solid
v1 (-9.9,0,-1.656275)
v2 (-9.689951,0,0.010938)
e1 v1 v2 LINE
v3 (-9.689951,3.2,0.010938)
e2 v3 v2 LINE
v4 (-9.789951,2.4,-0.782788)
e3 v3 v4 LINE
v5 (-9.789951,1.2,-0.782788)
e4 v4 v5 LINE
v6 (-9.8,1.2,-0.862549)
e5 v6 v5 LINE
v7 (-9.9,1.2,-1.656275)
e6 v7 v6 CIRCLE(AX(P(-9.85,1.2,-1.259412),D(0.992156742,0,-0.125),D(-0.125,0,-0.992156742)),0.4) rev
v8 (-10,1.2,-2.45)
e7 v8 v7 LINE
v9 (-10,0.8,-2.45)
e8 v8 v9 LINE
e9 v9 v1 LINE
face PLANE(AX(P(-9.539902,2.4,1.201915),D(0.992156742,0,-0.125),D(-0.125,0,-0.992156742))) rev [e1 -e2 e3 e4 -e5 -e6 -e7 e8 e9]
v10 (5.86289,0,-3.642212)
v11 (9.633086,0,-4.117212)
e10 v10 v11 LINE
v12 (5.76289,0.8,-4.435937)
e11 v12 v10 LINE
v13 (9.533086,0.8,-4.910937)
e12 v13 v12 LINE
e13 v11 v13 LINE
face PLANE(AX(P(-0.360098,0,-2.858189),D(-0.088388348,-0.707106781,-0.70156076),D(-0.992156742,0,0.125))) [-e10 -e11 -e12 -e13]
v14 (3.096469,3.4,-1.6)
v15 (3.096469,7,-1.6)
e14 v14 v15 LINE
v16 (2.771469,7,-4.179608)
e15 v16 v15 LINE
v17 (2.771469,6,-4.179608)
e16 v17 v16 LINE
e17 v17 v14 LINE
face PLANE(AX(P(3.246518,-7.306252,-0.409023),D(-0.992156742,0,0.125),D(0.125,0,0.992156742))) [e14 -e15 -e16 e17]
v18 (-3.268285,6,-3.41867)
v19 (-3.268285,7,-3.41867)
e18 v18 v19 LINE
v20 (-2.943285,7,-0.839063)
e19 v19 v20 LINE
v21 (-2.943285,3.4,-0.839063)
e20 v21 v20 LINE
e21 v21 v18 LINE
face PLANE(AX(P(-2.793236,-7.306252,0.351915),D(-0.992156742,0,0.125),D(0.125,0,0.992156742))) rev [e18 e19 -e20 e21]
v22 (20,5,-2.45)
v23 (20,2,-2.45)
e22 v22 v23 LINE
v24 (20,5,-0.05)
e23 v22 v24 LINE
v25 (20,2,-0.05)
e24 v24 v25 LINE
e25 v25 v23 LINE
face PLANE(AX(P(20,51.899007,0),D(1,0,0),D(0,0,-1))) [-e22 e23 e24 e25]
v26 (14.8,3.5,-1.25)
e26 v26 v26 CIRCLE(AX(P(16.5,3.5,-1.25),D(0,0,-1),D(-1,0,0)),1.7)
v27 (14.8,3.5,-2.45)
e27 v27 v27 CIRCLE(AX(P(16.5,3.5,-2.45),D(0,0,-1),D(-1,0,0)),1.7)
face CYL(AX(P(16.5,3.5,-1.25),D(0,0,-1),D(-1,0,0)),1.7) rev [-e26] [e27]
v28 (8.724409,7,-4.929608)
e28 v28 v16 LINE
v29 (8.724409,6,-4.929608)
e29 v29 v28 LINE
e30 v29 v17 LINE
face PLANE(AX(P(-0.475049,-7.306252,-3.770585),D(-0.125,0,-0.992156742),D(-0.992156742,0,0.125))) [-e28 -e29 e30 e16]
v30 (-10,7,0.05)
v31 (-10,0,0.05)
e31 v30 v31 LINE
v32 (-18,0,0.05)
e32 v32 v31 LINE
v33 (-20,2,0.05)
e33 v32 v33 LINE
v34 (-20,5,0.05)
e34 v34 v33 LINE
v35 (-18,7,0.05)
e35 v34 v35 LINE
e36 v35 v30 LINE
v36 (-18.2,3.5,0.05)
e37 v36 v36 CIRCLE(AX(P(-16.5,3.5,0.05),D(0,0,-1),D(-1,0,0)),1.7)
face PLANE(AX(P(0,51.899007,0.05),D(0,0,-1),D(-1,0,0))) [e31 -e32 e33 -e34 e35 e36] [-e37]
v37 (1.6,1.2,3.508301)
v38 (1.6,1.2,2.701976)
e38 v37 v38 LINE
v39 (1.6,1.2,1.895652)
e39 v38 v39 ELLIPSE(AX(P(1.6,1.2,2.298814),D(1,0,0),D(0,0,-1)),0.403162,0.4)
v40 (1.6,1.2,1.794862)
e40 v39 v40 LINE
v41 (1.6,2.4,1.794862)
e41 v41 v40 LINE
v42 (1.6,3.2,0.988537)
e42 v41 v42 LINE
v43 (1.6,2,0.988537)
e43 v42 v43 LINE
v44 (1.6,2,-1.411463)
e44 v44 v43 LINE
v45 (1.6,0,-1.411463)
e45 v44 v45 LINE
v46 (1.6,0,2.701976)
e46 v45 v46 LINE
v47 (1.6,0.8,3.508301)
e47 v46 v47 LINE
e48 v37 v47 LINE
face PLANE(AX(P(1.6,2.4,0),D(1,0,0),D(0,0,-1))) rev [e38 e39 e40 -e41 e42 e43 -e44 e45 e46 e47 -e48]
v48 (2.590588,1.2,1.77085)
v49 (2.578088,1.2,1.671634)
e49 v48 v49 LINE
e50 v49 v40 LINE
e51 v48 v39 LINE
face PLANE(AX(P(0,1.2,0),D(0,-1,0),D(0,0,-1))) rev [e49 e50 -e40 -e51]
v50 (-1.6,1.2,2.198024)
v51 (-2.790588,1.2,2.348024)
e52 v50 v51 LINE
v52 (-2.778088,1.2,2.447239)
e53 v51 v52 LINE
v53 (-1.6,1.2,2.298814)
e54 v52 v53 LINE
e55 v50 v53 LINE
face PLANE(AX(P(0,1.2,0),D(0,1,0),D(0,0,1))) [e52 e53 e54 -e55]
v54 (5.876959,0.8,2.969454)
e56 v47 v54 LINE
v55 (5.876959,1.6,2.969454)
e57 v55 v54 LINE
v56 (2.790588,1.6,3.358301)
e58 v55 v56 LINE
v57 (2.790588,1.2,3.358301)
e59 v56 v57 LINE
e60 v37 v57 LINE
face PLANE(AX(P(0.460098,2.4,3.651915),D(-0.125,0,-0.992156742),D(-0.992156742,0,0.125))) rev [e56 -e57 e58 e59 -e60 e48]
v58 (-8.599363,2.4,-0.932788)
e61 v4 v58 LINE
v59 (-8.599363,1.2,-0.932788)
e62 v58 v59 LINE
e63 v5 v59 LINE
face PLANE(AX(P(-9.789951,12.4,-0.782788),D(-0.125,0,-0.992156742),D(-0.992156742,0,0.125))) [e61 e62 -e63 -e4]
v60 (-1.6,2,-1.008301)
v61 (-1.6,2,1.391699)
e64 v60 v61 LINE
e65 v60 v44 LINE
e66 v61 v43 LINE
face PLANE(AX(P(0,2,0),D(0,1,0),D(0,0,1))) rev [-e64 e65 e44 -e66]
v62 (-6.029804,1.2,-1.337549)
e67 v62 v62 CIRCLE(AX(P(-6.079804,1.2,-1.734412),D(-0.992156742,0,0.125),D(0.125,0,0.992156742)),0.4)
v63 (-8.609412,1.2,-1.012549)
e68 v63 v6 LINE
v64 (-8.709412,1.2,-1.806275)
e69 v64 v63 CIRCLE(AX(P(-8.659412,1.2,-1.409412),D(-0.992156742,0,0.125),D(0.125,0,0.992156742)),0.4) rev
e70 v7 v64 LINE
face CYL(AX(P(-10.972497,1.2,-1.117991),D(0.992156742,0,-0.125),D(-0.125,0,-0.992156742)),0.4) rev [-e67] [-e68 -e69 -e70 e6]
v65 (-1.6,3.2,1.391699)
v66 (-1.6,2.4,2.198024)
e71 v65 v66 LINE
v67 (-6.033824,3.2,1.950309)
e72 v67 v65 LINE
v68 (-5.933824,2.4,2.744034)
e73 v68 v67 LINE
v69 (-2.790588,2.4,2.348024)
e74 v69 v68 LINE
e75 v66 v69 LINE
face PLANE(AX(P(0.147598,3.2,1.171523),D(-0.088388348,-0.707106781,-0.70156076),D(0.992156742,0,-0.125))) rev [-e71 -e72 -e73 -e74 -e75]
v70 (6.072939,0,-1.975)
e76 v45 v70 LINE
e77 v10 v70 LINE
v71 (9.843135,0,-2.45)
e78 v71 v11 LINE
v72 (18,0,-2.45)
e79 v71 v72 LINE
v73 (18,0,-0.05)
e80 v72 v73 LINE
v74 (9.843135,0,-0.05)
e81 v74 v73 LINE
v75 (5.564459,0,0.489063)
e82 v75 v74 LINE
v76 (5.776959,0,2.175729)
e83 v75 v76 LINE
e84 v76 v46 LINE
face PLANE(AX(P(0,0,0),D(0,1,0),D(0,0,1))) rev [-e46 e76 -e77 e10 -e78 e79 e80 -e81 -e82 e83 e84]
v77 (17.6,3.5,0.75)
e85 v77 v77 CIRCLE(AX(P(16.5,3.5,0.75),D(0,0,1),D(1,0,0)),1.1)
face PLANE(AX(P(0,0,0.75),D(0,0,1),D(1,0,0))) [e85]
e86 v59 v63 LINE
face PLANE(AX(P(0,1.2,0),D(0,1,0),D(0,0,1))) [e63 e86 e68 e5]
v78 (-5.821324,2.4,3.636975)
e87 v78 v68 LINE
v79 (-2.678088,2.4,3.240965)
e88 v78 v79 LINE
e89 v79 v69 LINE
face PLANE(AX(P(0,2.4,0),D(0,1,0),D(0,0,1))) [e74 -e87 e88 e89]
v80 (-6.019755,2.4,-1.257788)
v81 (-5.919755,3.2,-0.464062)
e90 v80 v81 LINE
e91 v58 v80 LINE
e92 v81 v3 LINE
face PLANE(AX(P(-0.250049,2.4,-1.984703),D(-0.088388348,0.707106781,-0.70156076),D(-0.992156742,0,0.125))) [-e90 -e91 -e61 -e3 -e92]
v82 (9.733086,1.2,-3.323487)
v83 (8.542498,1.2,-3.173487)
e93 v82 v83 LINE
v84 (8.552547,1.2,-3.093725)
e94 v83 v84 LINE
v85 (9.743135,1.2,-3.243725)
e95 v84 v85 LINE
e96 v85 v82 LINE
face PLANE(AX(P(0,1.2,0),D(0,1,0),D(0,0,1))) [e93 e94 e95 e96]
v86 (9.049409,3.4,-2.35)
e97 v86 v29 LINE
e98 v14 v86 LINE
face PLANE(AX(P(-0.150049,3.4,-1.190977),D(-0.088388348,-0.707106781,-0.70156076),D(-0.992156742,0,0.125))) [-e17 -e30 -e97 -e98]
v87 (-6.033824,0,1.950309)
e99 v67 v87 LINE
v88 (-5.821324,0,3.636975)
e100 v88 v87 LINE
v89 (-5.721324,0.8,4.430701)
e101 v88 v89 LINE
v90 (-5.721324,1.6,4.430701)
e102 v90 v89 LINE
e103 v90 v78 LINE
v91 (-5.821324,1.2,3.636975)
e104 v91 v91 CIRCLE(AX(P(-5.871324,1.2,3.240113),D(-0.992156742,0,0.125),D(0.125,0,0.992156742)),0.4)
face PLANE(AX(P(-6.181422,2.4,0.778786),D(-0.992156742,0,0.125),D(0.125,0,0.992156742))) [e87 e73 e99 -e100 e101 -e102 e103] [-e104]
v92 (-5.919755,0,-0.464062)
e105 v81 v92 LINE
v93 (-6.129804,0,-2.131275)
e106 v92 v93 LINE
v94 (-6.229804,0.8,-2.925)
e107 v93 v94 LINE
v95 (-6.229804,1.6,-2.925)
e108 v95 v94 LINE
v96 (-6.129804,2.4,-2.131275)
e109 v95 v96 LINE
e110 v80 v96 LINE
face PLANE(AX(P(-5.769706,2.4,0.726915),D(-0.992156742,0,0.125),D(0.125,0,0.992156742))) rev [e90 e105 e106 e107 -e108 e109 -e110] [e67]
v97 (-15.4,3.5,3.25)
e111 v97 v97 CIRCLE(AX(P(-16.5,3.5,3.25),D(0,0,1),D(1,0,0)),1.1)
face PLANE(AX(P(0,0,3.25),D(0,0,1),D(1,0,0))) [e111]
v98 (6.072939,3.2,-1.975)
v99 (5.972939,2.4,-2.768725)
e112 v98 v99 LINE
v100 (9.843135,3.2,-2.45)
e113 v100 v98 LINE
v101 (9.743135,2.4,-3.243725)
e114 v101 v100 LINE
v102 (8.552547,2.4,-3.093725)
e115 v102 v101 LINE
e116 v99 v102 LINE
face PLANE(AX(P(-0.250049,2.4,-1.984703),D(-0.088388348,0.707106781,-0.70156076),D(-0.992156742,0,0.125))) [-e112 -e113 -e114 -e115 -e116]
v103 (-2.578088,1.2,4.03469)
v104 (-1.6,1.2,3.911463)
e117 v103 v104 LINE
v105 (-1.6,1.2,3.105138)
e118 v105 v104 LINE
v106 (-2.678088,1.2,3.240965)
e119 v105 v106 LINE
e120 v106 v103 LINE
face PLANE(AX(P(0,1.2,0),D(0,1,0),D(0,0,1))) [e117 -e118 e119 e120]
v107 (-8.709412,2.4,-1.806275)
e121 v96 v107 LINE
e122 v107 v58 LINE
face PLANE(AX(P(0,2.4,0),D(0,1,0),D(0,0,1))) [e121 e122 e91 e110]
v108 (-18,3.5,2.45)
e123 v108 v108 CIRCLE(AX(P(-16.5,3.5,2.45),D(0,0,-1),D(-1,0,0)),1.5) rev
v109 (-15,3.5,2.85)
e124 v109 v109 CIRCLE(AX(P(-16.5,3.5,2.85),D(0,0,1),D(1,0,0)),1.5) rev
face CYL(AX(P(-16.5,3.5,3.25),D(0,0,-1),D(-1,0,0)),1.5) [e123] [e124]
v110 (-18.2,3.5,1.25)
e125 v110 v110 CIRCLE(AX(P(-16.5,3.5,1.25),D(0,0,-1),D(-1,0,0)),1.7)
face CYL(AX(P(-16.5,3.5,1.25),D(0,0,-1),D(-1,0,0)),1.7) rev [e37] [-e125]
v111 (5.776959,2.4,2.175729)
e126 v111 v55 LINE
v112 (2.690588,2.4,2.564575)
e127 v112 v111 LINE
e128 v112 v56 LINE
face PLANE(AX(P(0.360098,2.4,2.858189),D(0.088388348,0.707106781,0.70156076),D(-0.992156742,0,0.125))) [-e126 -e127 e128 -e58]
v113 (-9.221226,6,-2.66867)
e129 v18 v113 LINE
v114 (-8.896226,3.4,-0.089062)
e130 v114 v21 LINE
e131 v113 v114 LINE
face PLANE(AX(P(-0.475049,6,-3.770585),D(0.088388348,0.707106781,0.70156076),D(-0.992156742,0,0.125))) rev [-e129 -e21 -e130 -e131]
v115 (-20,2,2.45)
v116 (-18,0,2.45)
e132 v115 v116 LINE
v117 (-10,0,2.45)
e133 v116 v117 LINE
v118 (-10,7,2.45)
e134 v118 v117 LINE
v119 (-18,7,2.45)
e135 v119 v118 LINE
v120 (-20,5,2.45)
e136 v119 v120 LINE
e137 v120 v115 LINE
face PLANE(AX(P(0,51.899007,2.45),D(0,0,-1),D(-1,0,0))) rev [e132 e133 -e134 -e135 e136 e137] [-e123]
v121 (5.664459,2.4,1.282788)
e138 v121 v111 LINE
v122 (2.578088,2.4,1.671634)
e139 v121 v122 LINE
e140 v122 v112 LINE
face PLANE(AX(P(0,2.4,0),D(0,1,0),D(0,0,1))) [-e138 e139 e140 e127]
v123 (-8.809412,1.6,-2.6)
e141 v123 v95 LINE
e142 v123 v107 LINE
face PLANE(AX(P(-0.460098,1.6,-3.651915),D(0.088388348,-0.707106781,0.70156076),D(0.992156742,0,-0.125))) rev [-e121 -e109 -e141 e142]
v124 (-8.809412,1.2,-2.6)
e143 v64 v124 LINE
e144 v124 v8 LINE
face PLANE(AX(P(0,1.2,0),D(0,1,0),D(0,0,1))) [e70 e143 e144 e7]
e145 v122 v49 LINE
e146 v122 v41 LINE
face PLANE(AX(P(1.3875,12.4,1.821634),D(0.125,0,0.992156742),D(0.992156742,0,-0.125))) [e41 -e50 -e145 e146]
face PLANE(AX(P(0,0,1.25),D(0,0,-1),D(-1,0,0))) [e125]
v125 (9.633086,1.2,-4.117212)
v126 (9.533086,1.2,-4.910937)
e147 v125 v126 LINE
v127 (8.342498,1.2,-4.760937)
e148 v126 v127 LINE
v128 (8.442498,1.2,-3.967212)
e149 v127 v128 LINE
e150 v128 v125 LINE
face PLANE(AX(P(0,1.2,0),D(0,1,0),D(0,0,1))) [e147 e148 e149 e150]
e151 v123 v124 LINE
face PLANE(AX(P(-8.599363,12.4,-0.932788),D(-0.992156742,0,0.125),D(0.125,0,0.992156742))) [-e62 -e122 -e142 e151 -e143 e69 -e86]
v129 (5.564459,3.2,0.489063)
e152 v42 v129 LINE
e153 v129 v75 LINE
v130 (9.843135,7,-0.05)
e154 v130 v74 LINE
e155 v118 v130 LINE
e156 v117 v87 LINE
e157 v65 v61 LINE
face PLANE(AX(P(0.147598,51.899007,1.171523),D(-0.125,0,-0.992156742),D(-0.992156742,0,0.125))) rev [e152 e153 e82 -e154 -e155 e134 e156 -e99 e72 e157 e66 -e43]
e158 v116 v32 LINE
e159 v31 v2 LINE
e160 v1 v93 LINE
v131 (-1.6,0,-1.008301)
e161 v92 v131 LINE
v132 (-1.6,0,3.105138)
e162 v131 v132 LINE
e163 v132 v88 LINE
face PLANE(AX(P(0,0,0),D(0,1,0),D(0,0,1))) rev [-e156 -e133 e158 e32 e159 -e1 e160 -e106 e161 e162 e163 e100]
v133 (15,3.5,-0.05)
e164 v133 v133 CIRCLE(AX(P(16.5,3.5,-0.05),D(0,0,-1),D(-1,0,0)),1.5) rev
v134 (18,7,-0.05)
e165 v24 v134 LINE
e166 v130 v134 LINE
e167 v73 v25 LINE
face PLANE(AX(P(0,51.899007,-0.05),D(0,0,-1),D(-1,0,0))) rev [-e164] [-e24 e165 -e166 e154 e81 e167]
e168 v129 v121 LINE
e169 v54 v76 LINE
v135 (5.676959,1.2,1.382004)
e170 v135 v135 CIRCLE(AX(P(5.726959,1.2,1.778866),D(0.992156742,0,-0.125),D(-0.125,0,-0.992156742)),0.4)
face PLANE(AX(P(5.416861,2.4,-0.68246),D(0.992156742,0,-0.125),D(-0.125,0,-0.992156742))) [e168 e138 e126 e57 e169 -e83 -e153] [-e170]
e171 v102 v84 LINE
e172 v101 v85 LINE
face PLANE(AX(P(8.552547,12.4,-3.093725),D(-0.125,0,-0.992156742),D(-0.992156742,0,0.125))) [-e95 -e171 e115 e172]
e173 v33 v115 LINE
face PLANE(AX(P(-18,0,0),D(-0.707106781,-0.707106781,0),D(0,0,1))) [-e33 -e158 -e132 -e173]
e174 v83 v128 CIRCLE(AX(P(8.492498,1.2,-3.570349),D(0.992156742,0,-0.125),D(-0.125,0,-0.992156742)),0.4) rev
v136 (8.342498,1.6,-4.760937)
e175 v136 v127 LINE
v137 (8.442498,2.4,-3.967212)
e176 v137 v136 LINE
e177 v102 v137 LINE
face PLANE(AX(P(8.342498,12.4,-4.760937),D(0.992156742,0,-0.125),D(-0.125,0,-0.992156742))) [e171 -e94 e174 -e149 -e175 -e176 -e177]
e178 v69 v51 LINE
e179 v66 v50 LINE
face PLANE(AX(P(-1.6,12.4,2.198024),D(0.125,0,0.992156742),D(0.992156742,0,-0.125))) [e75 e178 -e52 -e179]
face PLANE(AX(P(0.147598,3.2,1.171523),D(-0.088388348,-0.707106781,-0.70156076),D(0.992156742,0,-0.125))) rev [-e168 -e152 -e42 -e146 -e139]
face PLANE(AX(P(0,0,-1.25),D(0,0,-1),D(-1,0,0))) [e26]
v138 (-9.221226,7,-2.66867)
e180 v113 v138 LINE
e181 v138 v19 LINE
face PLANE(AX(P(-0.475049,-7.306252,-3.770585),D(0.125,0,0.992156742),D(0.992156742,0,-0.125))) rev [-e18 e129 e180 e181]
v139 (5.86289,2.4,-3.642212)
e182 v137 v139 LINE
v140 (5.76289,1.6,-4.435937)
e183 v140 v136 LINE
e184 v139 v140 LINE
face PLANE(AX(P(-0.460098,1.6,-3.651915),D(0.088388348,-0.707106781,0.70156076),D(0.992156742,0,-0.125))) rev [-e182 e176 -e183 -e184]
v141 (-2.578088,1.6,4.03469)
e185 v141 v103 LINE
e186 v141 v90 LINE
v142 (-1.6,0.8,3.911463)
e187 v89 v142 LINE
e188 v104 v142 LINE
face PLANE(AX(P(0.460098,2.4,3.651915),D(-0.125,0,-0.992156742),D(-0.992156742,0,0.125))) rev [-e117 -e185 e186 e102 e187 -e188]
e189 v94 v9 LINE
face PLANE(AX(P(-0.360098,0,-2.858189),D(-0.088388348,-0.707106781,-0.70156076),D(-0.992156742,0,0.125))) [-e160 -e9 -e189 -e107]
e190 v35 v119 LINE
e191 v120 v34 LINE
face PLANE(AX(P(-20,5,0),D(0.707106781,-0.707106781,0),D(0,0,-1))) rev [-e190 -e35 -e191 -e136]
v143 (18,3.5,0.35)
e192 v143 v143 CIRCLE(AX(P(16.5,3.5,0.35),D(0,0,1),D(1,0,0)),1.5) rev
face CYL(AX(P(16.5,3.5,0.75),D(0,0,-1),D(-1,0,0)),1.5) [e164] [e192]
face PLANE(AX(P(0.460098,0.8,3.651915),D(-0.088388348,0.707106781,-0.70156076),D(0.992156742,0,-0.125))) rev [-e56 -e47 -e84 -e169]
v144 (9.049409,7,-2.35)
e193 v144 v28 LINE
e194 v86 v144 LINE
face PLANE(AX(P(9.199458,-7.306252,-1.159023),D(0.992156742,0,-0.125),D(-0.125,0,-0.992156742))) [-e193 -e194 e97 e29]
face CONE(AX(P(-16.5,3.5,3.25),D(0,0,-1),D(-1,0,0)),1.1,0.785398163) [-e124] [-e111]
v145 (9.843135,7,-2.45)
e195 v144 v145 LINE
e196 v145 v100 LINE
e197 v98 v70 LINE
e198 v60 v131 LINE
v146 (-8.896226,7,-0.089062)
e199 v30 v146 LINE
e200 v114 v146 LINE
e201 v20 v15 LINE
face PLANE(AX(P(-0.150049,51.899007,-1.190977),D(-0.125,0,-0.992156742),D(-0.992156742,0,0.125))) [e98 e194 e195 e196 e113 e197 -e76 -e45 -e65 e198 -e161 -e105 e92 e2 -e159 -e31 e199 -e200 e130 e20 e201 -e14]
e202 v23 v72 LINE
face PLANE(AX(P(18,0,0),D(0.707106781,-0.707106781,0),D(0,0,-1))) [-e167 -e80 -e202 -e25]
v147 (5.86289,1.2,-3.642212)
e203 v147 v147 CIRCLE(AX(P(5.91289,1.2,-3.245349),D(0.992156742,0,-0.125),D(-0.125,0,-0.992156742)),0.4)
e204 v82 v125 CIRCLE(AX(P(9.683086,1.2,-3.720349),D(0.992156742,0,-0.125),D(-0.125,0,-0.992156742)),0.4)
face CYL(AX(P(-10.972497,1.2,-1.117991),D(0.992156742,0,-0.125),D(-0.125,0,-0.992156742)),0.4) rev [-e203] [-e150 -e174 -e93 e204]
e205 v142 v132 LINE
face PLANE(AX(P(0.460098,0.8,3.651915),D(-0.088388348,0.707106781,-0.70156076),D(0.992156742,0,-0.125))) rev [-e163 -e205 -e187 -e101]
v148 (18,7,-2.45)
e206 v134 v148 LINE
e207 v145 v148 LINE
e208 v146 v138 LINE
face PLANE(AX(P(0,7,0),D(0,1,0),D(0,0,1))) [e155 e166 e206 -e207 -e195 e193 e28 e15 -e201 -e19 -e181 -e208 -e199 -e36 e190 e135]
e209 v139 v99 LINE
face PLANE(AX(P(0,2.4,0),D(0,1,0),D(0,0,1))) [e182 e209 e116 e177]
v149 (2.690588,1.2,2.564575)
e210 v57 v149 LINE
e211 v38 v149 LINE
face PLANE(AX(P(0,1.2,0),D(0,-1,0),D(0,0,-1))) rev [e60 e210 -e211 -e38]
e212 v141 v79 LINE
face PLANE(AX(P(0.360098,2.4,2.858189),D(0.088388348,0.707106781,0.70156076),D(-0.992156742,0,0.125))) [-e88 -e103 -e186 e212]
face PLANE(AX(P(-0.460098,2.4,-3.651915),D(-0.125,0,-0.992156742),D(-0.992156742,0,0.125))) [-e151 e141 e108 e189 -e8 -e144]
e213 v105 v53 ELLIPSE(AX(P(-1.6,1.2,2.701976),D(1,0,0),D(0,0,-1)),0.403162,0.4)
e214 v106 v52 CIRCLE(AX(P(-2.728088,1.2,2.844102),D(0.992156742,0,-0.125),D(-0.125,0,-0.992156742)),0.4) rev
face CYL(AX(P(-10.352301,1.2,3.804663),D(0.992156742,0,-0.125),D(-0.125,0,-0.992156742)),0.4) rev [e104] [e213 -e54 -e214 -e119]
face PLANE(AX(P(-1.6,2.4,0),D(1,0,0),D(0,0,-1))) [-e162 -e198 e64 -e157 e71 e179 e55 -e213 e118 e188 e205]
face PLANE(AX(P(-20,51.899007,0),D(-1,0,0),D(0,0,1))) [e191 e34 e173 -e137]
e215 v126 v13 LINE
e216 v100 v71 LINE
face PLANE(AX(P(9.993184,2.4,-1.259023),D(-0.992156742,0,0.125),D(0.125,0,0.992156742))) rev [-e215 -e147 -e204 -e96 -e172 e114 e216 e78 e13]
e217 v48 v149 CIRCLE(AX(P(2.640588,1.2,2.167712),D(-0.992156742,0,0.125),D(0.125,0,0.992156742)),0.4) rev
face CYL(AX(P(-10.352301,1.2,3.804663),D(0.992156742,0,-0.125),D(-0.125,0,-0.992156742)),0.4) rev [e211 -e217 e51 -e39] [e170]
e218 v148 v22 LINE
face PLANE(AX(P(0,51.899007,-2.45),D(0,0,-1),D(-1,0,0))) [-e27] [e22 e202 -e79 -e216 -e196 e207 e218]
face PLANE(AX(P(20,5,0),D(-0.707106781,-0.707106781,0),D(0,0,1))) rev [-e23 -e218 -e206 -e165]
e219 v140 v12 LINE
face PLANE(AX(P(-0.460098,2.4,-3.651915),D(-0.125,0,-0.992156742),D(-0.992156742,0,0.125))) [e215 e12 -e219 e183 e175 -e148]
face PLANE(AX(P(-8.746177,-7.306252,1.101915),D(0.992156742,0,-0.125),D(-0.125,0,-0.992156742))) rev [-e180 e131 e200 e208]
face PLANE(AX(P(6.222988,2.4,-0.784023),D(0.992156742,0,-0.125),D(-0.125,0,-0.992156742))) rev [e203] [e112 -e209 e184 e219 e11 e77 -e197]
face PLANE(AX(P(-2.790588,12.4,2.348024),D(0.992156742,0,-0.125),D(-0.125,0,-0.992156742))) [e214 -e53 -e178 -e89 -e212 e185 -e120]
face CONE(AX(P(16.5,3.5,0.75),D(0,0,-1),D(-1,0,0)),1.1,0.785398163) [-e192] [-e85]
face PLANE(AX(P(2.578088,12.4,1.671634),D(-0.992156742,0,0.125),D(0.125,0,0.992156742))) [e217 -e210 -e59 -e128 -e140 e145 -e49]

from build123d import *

# Parameters (mm, degrees)
BOSS_EXTRUDE4_DEPTH      = 2.4
BOSS_EXTRUDE4_2_DEPTH    = 2.4
BOSS_EXTRUDE4_3_DEPTH    = 2.4
BOSS_EXTRUDE4_4_DEPTH    = 2.4
BOSS_EXTRUDE5_DEPTH      = 7
SKETCH2_R                = 1.499999999999997
BOSS_EXTRUDE8_DEPTH      = 0.8
SKETCH3_R                = 1.5000000000000007
BOSS_EXTRUDE9_DEPTH      = 0.8
SKETCH4_R                = 1.6999999999999995
CUT_EXTRUDE3_DEPTH       = 1.2
SKETCH5_R                = 1.6999999999999995
CUT_EXTRUDE4_DEPTH       = 1.2
CHAMFER4_SIZE            = 2
CUT_EXTRUDE7_REACH       = 33.32
SKETCH8_R                = 0.3999999999999905
SKETCH8_R_2              = 0.4000000000000032
CUT_EXTRUDE10_DEPTH      = 2
CHAMFER6_SIZE            = 0.8
CUT_EXTRUDE11_DEPTH      = 10
CUT_EXTRUDE11_DEPTH_BACK = 1.2
BOSS_EXTRUDE10_DEPTH     = 3.6
CHAMFER8_SIZE            = 2.6
CHAMFER9_SIZE            = 0.4


with BuildPart() as part:
    # Sketch1 → Boss-Extrude4 (new body)
    with BuildSketch(Plane(origin=(0, 0, 0), x_dir=(1, 0, 0), z_dir=(0, 1, 0))):
        Polygon((-6.033824051637797, -1.9503087992717978), (-5.721324051637796, -4.430700653394863), (-1.5999999999999996, -3.911462628969018), (-1.5999999999999994, -1.3916994755741596), align=None)
    extrude(amount=BOSS_EXTRUDE4_DEPTH)



with BuildPart() as body_2:
    # Sketch1 → Boss-Extrude4 2 (new body)
    with BuildSketch(Plane(origin=(0, 0, 0), x_dir=(1, 0, 0), z_dir=(0, 1, 0))):
        Polygon((-10.000000000000064, 2.4499999999999993), (-9.689951018234682, -0.01093750000000027), (-5.919755399967642, 0.4640624999999997), (-6.229804381733024, 2.9250000000000003), align=None)
    extrude(amount=BOSS_EXTRUDE4_2_DEPTH)


with BuildPart() as body_3:
    # Sketch1 → Boss-Extrude4 3 (new body)
    with BuildSketch(Plane(origin=(0, 0, 0), x_dir=(1, 0, 0), z_dir=(0, 1, 0))):
        Polygon((5.564458884622125, -0.4890625000000022), (1.6000000000000032, -0.9885373710309839), (1.6000000000000008, -3.508300524425846), (5.876958884622125, -2.969454354123069), align=None)
    extrude(amount=BOSS_EXTRUDE4_3_DEPTH)


with BuildPart() as body_4:
    # Sketch1 → Boss-Extrude4 4 (new body)
    with BuildSketch(Plane(origin=(0, 0, 0), x_dir=(1, 0, 0), z_dir=(0, 1, 0))):
        Polygon((5.7628902329519684, 4.435937500000006), (6.072939214717352, 1.9750000000000023), (9.843134832984354, 2.4499999999999993), (9.533085851218969, 4.910937500000012), align=None)
    extrude(amount=BOSS_EXTRUDE4_4_DEPTH)


with BuildPart() as part_1:
    add(part.part)

    add(body_2.part)  # Boss-Extrude5 merges body 2

    add(body_3.part)  # Boss-Extrude5 merges body 3

    add(body_4.part)  # Boss-Extrude5 merges body 4
    # Sketch1<8> → Boss-Extrude5 (add)
    with BuildSketch(Plane(origin=(0, 0, 0), x_dir=(1, 0, 0), z_dir=(0, 1, 0))):
        Polygon((-20, -0.05000000000000027), (-20, -2.45), (-12, -2.4499999999999997), (-10.000000000000064, -2.4499999999999997), (-6.033824051637797, -1.950308799271796), (-1.9124999999999996, -1.431070774845953), (-1.6000000000000032, -1.391699475574159), (-1.5999999999999999, 1.0083005244258434), (-5.919755399967642, 0.4640624999999997), (-9.689951018234682, -0.01093750000000025), (-10.000000000000064, -0.05000000000000029), (-12, -0.05000000000000027), align=None)
        Polygon((1.6000000000000003, 1.4114626289690202), (1.6000000000000005, -0.988537371030981), (5.564458884622125, -0.4890625000000022), (9.687500000000064, 0.03039185412306233), (9.843134832984425, 0.05000000000000027), (12, 0.05000000000000013), (20, 0.05000000000000013), (20, 2.4499999999999997), (12, 2.4499999999999993), (9.843134832984353, 2.4499999999999993), (6.072939214717351, 1.975000000000004), (1.9100489817653816, 1.4505251289690204), align=None)
        Polygon((-1.5999999999999999, 1.0083005244258434), (-1.5999999999999994, -1.3916994755741596), (1.6000000000000032, -0.9885373710309839), (1.6000000000000003, 1.4114626289690202), align=None)
    extrude(amount=BOSS_EXTRUDE5_DEPTH)

    # Sketch2 → Boss-Extrude8 (add)
    with BuildSketch(Plane.XY.offset(2.4499999999999993)):
        with Locations(Location((-16.5, 3.4999999999999996, 0), (0, 0, 180))):
            Circle(SKETCH2_R)
    extrude(amount=BOSS_EXTRUDE8_DEPTH)

    # Sketch3 → Boss-Extrude9 (add)
    with BuildSketch(Plane.XY.offset(-0.05000000000000013)):
        with Locations(Location((16.5, 3.4999999999999996, 0), (0, 0, 180))):
            Circle(SKETCH3_R)
    extrude(amount=BOSS_EXTRUDE9_DEPTH)

    # Sketch4 → Cut-Extrude3 (cut)
    with BuildSketch(Plane(origin=(0, 0, 0.05000000000000041), x_dir=(-1, 0, -5e-17), z_dir=(5e-17, 0, -1))):
        with Locations((16.5, 3.4999999999999996)):
            Circle(SKETCH4_R)
    extrude(amount=-CUT_EXTRUDE3_DEPTH, mode=Mode.SUBTRACT)

    # Sketch5 → Cut-Extrude4 (cut)
    with BuildSketch(Plane(origin=(-1e-16, 0, -2.449999999999999), x_dir=(-1, 0, 5e-17), z_dir=(-5e-17, 0, -1))):
        with Locations((-16.5, 3.4999999999999996)):
            Circle(SKETCH5_R)
    extrude(amount=-CUT_EXTRUDE4_DEPTH, mode=Mode.SUBTRACT)

    # Chamfer4
    chamfer4_edges = [part_1.edges().sort_by_distance(p)[0] for p in [
        (20, 7, -1.25),
        (-20, 7, 1.2500000000000002),
        (-20, 0, 1.2500000000000002),
        (20, 0, -1.25),
    ]]
    chamfer(chamfer4_edges, length=CHAMFER4_SIZE)

    # Cut-Extrude7: up to this face of the body (flat: up to its plane)
    cut_extrude7_end = Plane(part_1.part.faces().sort_by_distance((-9.844975509, 1.2, -1.21953125))[0])
    # Sketch8 → Cut-Extrude7 (cut, up to the picked face)
    with BuildSketch(Plane(origin=(9.99318385334905, 0, -1.2590228229384695), x_dir=(-0.12500000000000053, 0, -0.9921567416492215), z_dir=(0.9921567416492215, 0, -0.12500000000000053)), mode=Mode.PRIVATE) as cut_extrude7_sk1:
        with Locations((2.4807840170405906, 1.2000000000000017)):
            Circle(SKETCH8_R)
    cut_extrude7_tool1 = split(extrude(cut_extrude7_sk1.sketch, amount=-CUT_EXTRUDE7_REACH, mode=Mode.PRIVATE), bisect_by=cut_extrude7_end, keep=Keep.BOTH, mode=Mode.PRIVATE)
    # Sketch8 → Cut-Extrude7 (cut, up to the picked face)
    with BuildSketch(Plane(origin=(9.99318385334905, 0, -1.2590228229384695), x_dir=(-0.12500000000000053, 0, -0.9921567416492215), z_dir=(0.9921567416492215, 0, -0.12500000000000053)), mode=Mode.PRIVATE) as cut_extrude7_sk2:
        with Locations((-2.4807840170405973, 1.200000000000001)):
            Circle(SKETCH8_R_2)
    cut_extrude7_tool2 = split(extrude(cut_extrude7_sk2.sketch, amount=-CUT_EXTRUDE7_REACH, mode=Mode.PRIVATE), bisect_by=cut_extrude7_end, keep=Keep.BOTH, mode=Mode.PRIVATE)
    add(cut_extrude7_tool1.solids().sort_by(Axis((9.683086, 1.2, -3.720349), (-0.9921567416492215, 0, 0.12500000000000053)))[0], mode=Mode.SUBTRACT)
    add(cut_extrude7_tool2.solids().sort_by(Axis((10.303282, 1.2, 1.202304), (-0.9921567416492215, 0, 0.12500000000000053)))[0], mode=Mode.SUBTRACT)

    # Sketch1<10> → Cut-Extrude10 (cut)
    with BuildSketch(Plane(origin=(0, 0, 0), x_dir=(1, 0, 0), z_dir=(0, 1, 0))):
        Polygon((-1.5999999999999999, 1.0083005244258434), (-1.5999999999999994, -1.3916994755741596), (1.6000000000000032, -0.9885373710309839), (1.6000000000000003, 1.4114626289690202), align=None)
        Polygon((-1.6, 3.5083005244258283), (-1.5999999999999999, 1.0083005244258434), (1.5999999999999979, 1.4114626289690202), (1.6, 3.9114626289690166), align=None)
        Polygon((1.6000000000000032, -0.9885373710309839), (-1.6000000000000032, -1.391699475574159), (-1.5999999999999992, -3.91146262896902), (1.6000000000000014, -3.5083005244258425), align=None)
    extrude(amount=CUT_EXTRUDE10_DEPTH, mode=Mode.SUBTRACT)

    # Chamfer6
    chamfer6_edges = [part_1.edges().sort_by_distance(p)[0] for p in [
        (-3.816912025818899, 2.4, 1.6710041374229787),
        (-3.660662025818898, 2.4, 4.17108164118194),
        (3.738479442311063, 0, 3.2388774392744577),
        (3.582229442311064, 2.4, 0.7387999355154931),
        (3.738479442311063, 2.4, 3.2388774392744577),
        (7.647988042085475, 2.4, -4.673437499999995),
        (7.958037023850853, 2.4, -2.2125000000000017),
        (7.647988042085475, 0, -4.673437499999995),
        (-3.660662025818898, 0, 4.17108164118194),
        (-8.114902190866543, 2.4, -2.6874999999999987),
        (-7.804853209101163, 2.4, -0.22656249999999975),
        (-8.114902190866543, 0, -2.6874999999999987),
    ]]
    chamfer(chamfer6_edges, length=CHAMFER6_SIZE)

    # Sketch9 → Cut-Extrude11 (cut, two sides: drawn at the far end of the back side and taken through both)
    with BuildSketch(Plane(origin=(0, 2.4, 0), x_dir=(1, 0, 0), z_dir=(0, 1, 0)).offset(-CUT_EXTRUDE11_DEPTH_BACK)):
        Polygon((-10.000000000000064, 2.4499999999999984), (-9.789951018234682, 0.7827878933193786), (-8.599362928255616, 0.9327878933193787), (-8.809411910021, 2.5999999999999988), align=None)
        Polygon((-1.5999999999999994, -2.198023684660508), (-2.7905880899790625, -2.348023684660507), (-2.578088089979061, -4.0346901454641975), (-1.3874999999999975, -3.884690145464198), align=None)
        Polygon((1.6000000000000008, -3.508300524425844), (1.3874999999999984, -1.8216340636221509), (2.5780880899790635, -1.671634063622151), (2.790588089979066, -3.3583005244258444), align=None)
        Polygon((9.533085851218972, 4.910937499999992), (8.342497761239906, 4.760937499999993), (8.552546743005287, 3.0937253933193816), (9.743134832984353, 3.2437253933193815), align=None)
    extrude(amount=CUT_EXTRUDE11_DEPTH + CUT_EXTRUDE11_DEPTH_BACK, mode=Mode.SUBTRACT)

    # Sketch10 → Boss-Extrude10 (add)
    with BuildSketch(Plane(origin=(0, 6.999999999999999, 0), x_dir=(1, 0, 0), z_dir=(0, 1, 0))):
        Polygon((8.724409439665015, 4.929607528287985), (2.7714689897696854, 4.179607528287982), (3.0964689897696878, 1.600000000000004), (9.04940943966502, 2.3500000000000094), align=None)
        Polygon((-9.221225624915308, 2.6686700282879747), (-8.896225624915308, 0.08906249999999957), (-2.943285175019977, 0.8390625000000002), (-3.2682851750199777, 3.418670028287977), align=None)
    extrude(amount=-BOSS_EXTRUDE10_DEPTH)

    # Chamfer8
    chamfer8_edges = [part_1.edges().sort_by_distance(p)[0] for p in [
        (-6.244755399967643, 3.399999999999999, -3.0436700282879756),
        (5.74793921471735, 3.399999999999999, -4.554607528287983),
    ]]
    chamfer(chamfer8_edges, length=CHAMFER8_SIZE - 0.0001)  # a hair under: the kernel refuses the full size

    # Chamfer9
    chamfer9_edges = [part_1.edges().sort_by_distance(p)[0] for p in [
        (-15.000000000000004, 3.499999999999999, 3.249999999999999),
        (18, 3.499999999999999, 0.7499999999999999),
    ]]
    chamfer(chamfer9_edges, length=CHAMFER9_SIZE)


solid = part_1.part
